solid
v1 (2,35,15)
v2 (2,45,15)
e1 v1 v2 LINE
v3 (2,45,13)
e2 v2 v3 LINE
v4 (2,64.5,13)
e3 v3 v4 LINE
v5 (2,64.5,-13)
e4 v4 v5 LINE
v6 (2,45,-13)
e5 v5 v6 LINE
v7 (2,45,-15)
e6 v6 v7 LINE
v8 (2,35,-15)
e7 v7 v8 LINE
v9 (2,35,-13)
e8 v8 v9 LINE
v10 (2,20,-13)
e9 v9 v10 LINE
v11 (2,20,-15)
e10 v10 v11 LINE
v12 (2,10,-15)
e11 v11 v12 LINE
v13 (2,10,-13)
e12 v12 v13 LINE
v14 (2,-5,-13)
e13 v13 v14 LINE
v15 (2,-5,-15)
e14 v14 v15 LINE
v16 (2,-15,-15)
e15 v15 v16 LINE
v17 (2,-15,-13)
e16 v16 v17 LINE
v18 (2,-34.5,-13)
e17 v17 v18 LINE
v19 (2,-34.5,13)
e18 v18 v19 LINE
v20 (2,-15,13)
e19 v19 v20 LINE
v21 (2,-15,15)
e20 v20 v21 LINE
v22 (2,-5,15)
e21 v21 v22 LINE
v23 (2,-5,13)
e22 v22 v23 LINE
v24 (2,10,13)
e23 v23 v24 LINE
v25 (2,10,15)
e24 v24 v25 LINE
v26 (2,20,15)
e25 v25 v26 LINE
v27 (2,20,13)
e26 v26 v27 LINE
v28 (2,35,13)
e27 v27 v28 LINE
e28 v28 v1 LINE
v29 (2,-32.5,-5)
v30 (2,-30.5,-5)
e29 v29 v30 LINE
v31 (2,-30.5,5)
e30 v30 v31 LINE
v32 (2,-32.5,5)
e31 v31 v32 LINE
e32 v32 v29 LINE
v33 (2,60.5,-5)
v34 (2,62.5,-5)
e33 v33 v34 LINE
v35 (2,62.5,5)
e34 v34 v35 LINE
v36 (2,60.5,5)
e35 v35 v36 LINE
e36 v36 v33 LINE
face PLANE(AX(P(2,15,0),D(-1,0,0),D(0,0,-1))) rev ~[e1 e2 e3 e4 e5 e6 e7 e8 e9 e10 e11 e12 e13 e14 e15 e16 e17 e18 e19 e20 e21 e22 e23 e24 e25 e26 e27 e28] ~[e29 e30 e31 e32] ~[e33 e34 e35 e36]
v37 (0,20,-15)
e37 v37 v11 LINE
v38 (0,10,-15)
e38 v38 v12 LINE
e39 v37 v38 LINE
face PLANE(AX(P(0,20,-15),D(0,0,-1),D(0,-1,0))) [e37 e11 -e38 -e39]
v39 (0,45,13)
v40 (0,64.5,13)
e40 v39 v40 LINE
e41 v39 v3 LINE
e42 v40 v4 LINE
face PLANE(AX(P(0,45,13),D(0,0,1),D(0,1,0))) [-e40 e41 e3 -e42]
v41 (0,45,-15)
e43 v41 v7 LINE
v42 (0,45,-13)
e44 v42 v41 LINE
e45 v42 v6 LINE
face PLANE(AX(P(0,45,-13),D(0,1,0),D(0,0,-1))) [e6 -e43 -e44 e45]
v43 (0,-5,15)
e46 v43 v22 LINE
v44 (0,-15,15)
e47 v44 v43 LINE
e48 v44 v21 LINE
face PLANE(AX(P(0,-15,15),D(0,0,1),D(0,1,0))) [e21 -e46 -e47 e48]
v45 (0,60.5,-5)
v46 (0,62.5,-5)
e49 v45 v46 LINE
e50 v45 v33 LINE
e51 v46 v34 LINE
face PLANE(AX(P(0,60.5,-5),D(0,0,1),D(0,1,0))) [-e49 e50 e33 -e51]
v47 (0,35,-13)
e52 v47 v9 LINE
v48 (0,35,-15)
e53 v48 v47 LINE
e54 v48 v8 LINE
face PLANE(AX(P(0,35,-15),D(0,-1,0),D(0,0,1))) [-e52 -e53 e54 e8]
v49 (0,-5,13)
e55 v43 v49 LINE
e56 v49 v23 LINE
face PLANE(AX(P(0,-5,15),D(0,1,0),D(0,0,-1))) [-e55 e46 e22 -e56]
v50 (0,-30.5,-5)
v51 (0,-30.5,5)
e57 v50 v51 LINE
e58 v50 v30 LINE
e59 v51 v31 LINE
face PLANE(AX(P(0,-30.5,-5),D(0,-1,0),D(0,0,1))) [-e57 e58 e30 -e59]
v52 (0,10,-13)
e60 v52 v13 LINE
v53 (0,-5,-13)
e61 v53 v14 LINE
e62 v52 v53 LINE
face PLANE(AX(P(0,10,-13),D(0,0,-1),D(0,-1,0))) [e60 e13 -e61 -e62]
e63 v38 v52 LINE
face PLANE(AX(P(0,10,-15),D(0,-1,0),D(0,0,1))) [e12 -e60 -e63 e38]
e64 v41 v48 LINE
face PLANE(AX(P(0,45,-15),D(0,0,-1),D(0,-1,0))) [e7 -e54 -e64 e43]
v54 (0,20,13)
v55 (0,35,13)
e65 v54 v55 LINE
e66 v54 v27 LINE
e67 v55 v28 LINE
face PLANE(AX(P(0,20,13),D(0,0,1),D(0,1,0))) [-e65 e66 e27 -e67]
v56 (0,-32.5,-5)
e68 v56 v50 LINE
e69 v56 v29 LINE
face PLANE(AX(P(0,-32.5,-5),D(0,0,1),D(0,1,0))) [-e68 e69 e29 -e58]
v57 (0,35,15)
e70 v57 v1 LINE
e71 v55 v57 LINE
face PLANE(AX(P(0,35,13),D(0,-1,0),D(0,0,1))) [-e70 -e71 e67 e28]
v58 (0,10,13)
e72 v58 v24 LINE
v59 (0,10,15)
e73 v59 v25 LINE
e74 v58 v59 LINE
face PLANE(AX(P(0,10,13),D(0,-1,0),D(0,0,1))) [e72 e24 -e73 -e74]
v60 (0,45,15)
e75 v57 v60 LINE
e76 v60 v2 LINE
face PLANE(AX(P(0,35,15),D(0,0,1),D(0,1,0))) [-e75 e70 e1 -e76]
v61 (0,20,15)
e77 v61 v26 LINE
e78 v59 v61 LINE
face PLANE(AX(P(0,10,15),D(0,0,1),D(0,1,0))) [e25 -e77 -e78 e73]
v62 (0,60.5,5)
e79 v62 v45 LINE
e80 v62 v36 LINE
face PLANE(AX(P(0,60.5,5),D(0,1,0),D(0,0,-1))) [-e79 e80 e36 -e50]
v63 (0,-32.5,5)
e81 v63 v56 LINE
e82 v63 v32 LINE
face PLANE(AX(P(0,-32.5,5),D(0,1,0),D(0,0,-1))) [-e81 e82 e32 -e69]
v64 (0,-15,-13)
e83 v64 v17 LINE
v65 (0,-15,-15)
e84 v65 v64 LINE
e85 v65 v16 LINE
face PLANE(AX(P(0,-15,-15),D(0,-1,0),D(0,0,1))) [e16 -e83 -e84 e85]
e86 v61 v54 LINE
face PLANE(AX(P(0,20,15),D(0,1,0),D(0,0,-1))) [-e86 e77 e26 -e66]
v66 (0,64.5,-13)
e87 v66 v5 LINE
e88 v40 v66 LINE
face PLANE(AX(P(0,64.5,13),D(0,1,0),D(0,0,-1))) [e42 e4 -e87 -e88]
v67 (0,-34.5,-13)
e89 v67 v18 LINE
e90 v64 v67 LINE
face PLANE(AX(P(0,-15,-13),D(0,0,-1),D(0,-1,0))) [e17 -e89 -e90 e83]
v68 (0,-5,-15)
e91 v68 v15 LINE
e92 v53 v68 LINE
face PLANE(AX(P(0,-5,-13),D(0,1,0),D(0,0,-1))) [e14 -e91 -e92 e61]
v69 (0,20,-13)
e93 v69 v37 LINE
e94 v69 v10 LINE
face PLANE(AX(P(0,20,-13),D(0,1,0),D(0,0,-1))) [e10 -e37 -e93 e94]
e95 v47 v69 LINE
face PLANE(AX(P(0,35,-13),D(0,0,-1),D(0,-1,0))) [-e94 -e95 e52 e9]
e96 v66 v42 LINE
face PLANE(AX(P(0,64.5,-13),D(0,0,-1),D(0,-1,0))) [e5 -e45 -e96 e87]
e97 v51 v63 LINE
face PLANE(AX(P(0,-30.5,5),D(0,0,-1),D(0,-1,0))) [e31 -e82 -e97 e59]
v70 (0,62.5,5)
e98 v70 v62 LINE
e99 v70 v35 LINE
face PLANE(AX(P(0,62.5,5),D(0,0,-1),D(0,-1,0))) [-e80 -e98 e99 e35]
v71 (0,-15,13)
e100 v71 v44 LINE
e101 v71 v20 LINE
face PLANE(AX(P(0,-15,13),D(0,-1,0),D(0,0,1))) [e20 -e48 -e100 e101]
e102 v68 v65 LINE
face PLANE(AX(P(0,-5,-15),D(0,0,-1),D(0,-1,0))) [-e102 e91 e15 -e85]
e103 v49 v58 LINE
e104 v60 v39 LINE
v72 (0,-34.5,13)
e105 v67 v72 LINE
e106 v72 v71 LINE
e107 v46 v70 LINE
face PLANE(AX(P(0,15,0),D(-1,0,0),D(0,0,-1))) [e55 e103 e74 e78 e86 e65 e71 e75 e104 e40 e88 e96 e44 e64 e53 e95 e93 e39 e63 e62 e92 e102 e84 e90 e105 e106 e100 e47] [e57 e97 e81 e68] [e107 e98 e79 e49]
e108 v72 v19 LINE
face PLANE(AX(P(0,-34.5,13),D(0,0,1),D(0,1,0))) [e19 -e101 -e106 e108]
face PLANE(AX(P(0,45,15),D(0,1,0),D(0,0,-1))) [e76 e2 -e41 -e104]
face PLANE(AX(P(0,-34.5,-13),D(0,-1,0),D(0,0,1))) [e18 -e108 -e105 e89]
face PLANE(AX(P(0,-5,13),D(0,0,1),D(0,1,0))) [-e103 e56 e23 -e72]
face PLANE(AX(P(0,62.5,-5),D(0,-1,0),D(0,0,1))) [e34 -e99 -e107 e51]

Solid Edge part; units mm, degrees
sketch "Sketch1" plane through (0, 0, 0) normal (1, 0, 0) x (0, 1, 0)
  line L0 (64.5, -13) -> (45, -13)
  line L1 (45, -13) -> (45, -15)
  line L2 (45, -15) -> (35, -15)
  line L3 (35, -15) -> (35, -13)
  line L4 (35, -13) -> (20, -13)
  line L5 (20, -13) -> (20, -15)
  line L6 (20, -15) -> (10, -15)
  line L7 (10, -15) -> (10, -13)
  line L8 (10, -13) -> (-5, -13)
  line L9 (-5, -13) -> (-5, -15)
  line L10 (-5, -15) -> (-15, -15)
  line L11 (-15, -15) -> (-15, -13)
  line L12 (-15, -13) -> (-34.5, -13)
  line L13 (-34.5, -13) -> (-34.5, 13)
  line L14 (-34.5, 13) -> (-15, 13)
  line L15 (-15, 13) -> (-15, 15)
  line L16 (-15, 15) -> (-5, 15)
  line L17 (-5, 15) -> (-5, 13)
  line L18 (-5, 13) -> (10, 13)
  line L19 (10, 13) -> (10, 15)
  line L20 (10, 15) -> (20, 15)
  line L21 (20, 15) -> (20, 13)
  line L22 (20, 13) -> (35, 13)
  line L23 (35, 13) -> (35, 15)
  line L24 (35, 15) -> (45, 15)
  line L25 (45, 15) -> (45, 13)
  line L26 (45, 13) -> (64.5, 13)
  line L27 (64.5, 13) -> (64.5, -13)
  line L28 (-32.5, -5) -> (-30.5, -5)
  line L29 (-32.5, 5) -> (-32.5, -5)
  line L30 (-30.5, 5) -> (-32.5, 5)
  line L31 (-30.5, -5) -> (-30.5, 5)
  line L32 (62.5, -5) -> (62.5, 5)
  line L33 (60.5, -5) -> (62.5, -5)
  line L34 (60.5, 5) -> (60.5, -5)
  line L35 (62.5, 5) -> (60.5, 5)
extrude "ExtrudedProtrusion_1" add sketch "Sketch1" along normal blind 2
properties material "Acrylic, high impact grade"
